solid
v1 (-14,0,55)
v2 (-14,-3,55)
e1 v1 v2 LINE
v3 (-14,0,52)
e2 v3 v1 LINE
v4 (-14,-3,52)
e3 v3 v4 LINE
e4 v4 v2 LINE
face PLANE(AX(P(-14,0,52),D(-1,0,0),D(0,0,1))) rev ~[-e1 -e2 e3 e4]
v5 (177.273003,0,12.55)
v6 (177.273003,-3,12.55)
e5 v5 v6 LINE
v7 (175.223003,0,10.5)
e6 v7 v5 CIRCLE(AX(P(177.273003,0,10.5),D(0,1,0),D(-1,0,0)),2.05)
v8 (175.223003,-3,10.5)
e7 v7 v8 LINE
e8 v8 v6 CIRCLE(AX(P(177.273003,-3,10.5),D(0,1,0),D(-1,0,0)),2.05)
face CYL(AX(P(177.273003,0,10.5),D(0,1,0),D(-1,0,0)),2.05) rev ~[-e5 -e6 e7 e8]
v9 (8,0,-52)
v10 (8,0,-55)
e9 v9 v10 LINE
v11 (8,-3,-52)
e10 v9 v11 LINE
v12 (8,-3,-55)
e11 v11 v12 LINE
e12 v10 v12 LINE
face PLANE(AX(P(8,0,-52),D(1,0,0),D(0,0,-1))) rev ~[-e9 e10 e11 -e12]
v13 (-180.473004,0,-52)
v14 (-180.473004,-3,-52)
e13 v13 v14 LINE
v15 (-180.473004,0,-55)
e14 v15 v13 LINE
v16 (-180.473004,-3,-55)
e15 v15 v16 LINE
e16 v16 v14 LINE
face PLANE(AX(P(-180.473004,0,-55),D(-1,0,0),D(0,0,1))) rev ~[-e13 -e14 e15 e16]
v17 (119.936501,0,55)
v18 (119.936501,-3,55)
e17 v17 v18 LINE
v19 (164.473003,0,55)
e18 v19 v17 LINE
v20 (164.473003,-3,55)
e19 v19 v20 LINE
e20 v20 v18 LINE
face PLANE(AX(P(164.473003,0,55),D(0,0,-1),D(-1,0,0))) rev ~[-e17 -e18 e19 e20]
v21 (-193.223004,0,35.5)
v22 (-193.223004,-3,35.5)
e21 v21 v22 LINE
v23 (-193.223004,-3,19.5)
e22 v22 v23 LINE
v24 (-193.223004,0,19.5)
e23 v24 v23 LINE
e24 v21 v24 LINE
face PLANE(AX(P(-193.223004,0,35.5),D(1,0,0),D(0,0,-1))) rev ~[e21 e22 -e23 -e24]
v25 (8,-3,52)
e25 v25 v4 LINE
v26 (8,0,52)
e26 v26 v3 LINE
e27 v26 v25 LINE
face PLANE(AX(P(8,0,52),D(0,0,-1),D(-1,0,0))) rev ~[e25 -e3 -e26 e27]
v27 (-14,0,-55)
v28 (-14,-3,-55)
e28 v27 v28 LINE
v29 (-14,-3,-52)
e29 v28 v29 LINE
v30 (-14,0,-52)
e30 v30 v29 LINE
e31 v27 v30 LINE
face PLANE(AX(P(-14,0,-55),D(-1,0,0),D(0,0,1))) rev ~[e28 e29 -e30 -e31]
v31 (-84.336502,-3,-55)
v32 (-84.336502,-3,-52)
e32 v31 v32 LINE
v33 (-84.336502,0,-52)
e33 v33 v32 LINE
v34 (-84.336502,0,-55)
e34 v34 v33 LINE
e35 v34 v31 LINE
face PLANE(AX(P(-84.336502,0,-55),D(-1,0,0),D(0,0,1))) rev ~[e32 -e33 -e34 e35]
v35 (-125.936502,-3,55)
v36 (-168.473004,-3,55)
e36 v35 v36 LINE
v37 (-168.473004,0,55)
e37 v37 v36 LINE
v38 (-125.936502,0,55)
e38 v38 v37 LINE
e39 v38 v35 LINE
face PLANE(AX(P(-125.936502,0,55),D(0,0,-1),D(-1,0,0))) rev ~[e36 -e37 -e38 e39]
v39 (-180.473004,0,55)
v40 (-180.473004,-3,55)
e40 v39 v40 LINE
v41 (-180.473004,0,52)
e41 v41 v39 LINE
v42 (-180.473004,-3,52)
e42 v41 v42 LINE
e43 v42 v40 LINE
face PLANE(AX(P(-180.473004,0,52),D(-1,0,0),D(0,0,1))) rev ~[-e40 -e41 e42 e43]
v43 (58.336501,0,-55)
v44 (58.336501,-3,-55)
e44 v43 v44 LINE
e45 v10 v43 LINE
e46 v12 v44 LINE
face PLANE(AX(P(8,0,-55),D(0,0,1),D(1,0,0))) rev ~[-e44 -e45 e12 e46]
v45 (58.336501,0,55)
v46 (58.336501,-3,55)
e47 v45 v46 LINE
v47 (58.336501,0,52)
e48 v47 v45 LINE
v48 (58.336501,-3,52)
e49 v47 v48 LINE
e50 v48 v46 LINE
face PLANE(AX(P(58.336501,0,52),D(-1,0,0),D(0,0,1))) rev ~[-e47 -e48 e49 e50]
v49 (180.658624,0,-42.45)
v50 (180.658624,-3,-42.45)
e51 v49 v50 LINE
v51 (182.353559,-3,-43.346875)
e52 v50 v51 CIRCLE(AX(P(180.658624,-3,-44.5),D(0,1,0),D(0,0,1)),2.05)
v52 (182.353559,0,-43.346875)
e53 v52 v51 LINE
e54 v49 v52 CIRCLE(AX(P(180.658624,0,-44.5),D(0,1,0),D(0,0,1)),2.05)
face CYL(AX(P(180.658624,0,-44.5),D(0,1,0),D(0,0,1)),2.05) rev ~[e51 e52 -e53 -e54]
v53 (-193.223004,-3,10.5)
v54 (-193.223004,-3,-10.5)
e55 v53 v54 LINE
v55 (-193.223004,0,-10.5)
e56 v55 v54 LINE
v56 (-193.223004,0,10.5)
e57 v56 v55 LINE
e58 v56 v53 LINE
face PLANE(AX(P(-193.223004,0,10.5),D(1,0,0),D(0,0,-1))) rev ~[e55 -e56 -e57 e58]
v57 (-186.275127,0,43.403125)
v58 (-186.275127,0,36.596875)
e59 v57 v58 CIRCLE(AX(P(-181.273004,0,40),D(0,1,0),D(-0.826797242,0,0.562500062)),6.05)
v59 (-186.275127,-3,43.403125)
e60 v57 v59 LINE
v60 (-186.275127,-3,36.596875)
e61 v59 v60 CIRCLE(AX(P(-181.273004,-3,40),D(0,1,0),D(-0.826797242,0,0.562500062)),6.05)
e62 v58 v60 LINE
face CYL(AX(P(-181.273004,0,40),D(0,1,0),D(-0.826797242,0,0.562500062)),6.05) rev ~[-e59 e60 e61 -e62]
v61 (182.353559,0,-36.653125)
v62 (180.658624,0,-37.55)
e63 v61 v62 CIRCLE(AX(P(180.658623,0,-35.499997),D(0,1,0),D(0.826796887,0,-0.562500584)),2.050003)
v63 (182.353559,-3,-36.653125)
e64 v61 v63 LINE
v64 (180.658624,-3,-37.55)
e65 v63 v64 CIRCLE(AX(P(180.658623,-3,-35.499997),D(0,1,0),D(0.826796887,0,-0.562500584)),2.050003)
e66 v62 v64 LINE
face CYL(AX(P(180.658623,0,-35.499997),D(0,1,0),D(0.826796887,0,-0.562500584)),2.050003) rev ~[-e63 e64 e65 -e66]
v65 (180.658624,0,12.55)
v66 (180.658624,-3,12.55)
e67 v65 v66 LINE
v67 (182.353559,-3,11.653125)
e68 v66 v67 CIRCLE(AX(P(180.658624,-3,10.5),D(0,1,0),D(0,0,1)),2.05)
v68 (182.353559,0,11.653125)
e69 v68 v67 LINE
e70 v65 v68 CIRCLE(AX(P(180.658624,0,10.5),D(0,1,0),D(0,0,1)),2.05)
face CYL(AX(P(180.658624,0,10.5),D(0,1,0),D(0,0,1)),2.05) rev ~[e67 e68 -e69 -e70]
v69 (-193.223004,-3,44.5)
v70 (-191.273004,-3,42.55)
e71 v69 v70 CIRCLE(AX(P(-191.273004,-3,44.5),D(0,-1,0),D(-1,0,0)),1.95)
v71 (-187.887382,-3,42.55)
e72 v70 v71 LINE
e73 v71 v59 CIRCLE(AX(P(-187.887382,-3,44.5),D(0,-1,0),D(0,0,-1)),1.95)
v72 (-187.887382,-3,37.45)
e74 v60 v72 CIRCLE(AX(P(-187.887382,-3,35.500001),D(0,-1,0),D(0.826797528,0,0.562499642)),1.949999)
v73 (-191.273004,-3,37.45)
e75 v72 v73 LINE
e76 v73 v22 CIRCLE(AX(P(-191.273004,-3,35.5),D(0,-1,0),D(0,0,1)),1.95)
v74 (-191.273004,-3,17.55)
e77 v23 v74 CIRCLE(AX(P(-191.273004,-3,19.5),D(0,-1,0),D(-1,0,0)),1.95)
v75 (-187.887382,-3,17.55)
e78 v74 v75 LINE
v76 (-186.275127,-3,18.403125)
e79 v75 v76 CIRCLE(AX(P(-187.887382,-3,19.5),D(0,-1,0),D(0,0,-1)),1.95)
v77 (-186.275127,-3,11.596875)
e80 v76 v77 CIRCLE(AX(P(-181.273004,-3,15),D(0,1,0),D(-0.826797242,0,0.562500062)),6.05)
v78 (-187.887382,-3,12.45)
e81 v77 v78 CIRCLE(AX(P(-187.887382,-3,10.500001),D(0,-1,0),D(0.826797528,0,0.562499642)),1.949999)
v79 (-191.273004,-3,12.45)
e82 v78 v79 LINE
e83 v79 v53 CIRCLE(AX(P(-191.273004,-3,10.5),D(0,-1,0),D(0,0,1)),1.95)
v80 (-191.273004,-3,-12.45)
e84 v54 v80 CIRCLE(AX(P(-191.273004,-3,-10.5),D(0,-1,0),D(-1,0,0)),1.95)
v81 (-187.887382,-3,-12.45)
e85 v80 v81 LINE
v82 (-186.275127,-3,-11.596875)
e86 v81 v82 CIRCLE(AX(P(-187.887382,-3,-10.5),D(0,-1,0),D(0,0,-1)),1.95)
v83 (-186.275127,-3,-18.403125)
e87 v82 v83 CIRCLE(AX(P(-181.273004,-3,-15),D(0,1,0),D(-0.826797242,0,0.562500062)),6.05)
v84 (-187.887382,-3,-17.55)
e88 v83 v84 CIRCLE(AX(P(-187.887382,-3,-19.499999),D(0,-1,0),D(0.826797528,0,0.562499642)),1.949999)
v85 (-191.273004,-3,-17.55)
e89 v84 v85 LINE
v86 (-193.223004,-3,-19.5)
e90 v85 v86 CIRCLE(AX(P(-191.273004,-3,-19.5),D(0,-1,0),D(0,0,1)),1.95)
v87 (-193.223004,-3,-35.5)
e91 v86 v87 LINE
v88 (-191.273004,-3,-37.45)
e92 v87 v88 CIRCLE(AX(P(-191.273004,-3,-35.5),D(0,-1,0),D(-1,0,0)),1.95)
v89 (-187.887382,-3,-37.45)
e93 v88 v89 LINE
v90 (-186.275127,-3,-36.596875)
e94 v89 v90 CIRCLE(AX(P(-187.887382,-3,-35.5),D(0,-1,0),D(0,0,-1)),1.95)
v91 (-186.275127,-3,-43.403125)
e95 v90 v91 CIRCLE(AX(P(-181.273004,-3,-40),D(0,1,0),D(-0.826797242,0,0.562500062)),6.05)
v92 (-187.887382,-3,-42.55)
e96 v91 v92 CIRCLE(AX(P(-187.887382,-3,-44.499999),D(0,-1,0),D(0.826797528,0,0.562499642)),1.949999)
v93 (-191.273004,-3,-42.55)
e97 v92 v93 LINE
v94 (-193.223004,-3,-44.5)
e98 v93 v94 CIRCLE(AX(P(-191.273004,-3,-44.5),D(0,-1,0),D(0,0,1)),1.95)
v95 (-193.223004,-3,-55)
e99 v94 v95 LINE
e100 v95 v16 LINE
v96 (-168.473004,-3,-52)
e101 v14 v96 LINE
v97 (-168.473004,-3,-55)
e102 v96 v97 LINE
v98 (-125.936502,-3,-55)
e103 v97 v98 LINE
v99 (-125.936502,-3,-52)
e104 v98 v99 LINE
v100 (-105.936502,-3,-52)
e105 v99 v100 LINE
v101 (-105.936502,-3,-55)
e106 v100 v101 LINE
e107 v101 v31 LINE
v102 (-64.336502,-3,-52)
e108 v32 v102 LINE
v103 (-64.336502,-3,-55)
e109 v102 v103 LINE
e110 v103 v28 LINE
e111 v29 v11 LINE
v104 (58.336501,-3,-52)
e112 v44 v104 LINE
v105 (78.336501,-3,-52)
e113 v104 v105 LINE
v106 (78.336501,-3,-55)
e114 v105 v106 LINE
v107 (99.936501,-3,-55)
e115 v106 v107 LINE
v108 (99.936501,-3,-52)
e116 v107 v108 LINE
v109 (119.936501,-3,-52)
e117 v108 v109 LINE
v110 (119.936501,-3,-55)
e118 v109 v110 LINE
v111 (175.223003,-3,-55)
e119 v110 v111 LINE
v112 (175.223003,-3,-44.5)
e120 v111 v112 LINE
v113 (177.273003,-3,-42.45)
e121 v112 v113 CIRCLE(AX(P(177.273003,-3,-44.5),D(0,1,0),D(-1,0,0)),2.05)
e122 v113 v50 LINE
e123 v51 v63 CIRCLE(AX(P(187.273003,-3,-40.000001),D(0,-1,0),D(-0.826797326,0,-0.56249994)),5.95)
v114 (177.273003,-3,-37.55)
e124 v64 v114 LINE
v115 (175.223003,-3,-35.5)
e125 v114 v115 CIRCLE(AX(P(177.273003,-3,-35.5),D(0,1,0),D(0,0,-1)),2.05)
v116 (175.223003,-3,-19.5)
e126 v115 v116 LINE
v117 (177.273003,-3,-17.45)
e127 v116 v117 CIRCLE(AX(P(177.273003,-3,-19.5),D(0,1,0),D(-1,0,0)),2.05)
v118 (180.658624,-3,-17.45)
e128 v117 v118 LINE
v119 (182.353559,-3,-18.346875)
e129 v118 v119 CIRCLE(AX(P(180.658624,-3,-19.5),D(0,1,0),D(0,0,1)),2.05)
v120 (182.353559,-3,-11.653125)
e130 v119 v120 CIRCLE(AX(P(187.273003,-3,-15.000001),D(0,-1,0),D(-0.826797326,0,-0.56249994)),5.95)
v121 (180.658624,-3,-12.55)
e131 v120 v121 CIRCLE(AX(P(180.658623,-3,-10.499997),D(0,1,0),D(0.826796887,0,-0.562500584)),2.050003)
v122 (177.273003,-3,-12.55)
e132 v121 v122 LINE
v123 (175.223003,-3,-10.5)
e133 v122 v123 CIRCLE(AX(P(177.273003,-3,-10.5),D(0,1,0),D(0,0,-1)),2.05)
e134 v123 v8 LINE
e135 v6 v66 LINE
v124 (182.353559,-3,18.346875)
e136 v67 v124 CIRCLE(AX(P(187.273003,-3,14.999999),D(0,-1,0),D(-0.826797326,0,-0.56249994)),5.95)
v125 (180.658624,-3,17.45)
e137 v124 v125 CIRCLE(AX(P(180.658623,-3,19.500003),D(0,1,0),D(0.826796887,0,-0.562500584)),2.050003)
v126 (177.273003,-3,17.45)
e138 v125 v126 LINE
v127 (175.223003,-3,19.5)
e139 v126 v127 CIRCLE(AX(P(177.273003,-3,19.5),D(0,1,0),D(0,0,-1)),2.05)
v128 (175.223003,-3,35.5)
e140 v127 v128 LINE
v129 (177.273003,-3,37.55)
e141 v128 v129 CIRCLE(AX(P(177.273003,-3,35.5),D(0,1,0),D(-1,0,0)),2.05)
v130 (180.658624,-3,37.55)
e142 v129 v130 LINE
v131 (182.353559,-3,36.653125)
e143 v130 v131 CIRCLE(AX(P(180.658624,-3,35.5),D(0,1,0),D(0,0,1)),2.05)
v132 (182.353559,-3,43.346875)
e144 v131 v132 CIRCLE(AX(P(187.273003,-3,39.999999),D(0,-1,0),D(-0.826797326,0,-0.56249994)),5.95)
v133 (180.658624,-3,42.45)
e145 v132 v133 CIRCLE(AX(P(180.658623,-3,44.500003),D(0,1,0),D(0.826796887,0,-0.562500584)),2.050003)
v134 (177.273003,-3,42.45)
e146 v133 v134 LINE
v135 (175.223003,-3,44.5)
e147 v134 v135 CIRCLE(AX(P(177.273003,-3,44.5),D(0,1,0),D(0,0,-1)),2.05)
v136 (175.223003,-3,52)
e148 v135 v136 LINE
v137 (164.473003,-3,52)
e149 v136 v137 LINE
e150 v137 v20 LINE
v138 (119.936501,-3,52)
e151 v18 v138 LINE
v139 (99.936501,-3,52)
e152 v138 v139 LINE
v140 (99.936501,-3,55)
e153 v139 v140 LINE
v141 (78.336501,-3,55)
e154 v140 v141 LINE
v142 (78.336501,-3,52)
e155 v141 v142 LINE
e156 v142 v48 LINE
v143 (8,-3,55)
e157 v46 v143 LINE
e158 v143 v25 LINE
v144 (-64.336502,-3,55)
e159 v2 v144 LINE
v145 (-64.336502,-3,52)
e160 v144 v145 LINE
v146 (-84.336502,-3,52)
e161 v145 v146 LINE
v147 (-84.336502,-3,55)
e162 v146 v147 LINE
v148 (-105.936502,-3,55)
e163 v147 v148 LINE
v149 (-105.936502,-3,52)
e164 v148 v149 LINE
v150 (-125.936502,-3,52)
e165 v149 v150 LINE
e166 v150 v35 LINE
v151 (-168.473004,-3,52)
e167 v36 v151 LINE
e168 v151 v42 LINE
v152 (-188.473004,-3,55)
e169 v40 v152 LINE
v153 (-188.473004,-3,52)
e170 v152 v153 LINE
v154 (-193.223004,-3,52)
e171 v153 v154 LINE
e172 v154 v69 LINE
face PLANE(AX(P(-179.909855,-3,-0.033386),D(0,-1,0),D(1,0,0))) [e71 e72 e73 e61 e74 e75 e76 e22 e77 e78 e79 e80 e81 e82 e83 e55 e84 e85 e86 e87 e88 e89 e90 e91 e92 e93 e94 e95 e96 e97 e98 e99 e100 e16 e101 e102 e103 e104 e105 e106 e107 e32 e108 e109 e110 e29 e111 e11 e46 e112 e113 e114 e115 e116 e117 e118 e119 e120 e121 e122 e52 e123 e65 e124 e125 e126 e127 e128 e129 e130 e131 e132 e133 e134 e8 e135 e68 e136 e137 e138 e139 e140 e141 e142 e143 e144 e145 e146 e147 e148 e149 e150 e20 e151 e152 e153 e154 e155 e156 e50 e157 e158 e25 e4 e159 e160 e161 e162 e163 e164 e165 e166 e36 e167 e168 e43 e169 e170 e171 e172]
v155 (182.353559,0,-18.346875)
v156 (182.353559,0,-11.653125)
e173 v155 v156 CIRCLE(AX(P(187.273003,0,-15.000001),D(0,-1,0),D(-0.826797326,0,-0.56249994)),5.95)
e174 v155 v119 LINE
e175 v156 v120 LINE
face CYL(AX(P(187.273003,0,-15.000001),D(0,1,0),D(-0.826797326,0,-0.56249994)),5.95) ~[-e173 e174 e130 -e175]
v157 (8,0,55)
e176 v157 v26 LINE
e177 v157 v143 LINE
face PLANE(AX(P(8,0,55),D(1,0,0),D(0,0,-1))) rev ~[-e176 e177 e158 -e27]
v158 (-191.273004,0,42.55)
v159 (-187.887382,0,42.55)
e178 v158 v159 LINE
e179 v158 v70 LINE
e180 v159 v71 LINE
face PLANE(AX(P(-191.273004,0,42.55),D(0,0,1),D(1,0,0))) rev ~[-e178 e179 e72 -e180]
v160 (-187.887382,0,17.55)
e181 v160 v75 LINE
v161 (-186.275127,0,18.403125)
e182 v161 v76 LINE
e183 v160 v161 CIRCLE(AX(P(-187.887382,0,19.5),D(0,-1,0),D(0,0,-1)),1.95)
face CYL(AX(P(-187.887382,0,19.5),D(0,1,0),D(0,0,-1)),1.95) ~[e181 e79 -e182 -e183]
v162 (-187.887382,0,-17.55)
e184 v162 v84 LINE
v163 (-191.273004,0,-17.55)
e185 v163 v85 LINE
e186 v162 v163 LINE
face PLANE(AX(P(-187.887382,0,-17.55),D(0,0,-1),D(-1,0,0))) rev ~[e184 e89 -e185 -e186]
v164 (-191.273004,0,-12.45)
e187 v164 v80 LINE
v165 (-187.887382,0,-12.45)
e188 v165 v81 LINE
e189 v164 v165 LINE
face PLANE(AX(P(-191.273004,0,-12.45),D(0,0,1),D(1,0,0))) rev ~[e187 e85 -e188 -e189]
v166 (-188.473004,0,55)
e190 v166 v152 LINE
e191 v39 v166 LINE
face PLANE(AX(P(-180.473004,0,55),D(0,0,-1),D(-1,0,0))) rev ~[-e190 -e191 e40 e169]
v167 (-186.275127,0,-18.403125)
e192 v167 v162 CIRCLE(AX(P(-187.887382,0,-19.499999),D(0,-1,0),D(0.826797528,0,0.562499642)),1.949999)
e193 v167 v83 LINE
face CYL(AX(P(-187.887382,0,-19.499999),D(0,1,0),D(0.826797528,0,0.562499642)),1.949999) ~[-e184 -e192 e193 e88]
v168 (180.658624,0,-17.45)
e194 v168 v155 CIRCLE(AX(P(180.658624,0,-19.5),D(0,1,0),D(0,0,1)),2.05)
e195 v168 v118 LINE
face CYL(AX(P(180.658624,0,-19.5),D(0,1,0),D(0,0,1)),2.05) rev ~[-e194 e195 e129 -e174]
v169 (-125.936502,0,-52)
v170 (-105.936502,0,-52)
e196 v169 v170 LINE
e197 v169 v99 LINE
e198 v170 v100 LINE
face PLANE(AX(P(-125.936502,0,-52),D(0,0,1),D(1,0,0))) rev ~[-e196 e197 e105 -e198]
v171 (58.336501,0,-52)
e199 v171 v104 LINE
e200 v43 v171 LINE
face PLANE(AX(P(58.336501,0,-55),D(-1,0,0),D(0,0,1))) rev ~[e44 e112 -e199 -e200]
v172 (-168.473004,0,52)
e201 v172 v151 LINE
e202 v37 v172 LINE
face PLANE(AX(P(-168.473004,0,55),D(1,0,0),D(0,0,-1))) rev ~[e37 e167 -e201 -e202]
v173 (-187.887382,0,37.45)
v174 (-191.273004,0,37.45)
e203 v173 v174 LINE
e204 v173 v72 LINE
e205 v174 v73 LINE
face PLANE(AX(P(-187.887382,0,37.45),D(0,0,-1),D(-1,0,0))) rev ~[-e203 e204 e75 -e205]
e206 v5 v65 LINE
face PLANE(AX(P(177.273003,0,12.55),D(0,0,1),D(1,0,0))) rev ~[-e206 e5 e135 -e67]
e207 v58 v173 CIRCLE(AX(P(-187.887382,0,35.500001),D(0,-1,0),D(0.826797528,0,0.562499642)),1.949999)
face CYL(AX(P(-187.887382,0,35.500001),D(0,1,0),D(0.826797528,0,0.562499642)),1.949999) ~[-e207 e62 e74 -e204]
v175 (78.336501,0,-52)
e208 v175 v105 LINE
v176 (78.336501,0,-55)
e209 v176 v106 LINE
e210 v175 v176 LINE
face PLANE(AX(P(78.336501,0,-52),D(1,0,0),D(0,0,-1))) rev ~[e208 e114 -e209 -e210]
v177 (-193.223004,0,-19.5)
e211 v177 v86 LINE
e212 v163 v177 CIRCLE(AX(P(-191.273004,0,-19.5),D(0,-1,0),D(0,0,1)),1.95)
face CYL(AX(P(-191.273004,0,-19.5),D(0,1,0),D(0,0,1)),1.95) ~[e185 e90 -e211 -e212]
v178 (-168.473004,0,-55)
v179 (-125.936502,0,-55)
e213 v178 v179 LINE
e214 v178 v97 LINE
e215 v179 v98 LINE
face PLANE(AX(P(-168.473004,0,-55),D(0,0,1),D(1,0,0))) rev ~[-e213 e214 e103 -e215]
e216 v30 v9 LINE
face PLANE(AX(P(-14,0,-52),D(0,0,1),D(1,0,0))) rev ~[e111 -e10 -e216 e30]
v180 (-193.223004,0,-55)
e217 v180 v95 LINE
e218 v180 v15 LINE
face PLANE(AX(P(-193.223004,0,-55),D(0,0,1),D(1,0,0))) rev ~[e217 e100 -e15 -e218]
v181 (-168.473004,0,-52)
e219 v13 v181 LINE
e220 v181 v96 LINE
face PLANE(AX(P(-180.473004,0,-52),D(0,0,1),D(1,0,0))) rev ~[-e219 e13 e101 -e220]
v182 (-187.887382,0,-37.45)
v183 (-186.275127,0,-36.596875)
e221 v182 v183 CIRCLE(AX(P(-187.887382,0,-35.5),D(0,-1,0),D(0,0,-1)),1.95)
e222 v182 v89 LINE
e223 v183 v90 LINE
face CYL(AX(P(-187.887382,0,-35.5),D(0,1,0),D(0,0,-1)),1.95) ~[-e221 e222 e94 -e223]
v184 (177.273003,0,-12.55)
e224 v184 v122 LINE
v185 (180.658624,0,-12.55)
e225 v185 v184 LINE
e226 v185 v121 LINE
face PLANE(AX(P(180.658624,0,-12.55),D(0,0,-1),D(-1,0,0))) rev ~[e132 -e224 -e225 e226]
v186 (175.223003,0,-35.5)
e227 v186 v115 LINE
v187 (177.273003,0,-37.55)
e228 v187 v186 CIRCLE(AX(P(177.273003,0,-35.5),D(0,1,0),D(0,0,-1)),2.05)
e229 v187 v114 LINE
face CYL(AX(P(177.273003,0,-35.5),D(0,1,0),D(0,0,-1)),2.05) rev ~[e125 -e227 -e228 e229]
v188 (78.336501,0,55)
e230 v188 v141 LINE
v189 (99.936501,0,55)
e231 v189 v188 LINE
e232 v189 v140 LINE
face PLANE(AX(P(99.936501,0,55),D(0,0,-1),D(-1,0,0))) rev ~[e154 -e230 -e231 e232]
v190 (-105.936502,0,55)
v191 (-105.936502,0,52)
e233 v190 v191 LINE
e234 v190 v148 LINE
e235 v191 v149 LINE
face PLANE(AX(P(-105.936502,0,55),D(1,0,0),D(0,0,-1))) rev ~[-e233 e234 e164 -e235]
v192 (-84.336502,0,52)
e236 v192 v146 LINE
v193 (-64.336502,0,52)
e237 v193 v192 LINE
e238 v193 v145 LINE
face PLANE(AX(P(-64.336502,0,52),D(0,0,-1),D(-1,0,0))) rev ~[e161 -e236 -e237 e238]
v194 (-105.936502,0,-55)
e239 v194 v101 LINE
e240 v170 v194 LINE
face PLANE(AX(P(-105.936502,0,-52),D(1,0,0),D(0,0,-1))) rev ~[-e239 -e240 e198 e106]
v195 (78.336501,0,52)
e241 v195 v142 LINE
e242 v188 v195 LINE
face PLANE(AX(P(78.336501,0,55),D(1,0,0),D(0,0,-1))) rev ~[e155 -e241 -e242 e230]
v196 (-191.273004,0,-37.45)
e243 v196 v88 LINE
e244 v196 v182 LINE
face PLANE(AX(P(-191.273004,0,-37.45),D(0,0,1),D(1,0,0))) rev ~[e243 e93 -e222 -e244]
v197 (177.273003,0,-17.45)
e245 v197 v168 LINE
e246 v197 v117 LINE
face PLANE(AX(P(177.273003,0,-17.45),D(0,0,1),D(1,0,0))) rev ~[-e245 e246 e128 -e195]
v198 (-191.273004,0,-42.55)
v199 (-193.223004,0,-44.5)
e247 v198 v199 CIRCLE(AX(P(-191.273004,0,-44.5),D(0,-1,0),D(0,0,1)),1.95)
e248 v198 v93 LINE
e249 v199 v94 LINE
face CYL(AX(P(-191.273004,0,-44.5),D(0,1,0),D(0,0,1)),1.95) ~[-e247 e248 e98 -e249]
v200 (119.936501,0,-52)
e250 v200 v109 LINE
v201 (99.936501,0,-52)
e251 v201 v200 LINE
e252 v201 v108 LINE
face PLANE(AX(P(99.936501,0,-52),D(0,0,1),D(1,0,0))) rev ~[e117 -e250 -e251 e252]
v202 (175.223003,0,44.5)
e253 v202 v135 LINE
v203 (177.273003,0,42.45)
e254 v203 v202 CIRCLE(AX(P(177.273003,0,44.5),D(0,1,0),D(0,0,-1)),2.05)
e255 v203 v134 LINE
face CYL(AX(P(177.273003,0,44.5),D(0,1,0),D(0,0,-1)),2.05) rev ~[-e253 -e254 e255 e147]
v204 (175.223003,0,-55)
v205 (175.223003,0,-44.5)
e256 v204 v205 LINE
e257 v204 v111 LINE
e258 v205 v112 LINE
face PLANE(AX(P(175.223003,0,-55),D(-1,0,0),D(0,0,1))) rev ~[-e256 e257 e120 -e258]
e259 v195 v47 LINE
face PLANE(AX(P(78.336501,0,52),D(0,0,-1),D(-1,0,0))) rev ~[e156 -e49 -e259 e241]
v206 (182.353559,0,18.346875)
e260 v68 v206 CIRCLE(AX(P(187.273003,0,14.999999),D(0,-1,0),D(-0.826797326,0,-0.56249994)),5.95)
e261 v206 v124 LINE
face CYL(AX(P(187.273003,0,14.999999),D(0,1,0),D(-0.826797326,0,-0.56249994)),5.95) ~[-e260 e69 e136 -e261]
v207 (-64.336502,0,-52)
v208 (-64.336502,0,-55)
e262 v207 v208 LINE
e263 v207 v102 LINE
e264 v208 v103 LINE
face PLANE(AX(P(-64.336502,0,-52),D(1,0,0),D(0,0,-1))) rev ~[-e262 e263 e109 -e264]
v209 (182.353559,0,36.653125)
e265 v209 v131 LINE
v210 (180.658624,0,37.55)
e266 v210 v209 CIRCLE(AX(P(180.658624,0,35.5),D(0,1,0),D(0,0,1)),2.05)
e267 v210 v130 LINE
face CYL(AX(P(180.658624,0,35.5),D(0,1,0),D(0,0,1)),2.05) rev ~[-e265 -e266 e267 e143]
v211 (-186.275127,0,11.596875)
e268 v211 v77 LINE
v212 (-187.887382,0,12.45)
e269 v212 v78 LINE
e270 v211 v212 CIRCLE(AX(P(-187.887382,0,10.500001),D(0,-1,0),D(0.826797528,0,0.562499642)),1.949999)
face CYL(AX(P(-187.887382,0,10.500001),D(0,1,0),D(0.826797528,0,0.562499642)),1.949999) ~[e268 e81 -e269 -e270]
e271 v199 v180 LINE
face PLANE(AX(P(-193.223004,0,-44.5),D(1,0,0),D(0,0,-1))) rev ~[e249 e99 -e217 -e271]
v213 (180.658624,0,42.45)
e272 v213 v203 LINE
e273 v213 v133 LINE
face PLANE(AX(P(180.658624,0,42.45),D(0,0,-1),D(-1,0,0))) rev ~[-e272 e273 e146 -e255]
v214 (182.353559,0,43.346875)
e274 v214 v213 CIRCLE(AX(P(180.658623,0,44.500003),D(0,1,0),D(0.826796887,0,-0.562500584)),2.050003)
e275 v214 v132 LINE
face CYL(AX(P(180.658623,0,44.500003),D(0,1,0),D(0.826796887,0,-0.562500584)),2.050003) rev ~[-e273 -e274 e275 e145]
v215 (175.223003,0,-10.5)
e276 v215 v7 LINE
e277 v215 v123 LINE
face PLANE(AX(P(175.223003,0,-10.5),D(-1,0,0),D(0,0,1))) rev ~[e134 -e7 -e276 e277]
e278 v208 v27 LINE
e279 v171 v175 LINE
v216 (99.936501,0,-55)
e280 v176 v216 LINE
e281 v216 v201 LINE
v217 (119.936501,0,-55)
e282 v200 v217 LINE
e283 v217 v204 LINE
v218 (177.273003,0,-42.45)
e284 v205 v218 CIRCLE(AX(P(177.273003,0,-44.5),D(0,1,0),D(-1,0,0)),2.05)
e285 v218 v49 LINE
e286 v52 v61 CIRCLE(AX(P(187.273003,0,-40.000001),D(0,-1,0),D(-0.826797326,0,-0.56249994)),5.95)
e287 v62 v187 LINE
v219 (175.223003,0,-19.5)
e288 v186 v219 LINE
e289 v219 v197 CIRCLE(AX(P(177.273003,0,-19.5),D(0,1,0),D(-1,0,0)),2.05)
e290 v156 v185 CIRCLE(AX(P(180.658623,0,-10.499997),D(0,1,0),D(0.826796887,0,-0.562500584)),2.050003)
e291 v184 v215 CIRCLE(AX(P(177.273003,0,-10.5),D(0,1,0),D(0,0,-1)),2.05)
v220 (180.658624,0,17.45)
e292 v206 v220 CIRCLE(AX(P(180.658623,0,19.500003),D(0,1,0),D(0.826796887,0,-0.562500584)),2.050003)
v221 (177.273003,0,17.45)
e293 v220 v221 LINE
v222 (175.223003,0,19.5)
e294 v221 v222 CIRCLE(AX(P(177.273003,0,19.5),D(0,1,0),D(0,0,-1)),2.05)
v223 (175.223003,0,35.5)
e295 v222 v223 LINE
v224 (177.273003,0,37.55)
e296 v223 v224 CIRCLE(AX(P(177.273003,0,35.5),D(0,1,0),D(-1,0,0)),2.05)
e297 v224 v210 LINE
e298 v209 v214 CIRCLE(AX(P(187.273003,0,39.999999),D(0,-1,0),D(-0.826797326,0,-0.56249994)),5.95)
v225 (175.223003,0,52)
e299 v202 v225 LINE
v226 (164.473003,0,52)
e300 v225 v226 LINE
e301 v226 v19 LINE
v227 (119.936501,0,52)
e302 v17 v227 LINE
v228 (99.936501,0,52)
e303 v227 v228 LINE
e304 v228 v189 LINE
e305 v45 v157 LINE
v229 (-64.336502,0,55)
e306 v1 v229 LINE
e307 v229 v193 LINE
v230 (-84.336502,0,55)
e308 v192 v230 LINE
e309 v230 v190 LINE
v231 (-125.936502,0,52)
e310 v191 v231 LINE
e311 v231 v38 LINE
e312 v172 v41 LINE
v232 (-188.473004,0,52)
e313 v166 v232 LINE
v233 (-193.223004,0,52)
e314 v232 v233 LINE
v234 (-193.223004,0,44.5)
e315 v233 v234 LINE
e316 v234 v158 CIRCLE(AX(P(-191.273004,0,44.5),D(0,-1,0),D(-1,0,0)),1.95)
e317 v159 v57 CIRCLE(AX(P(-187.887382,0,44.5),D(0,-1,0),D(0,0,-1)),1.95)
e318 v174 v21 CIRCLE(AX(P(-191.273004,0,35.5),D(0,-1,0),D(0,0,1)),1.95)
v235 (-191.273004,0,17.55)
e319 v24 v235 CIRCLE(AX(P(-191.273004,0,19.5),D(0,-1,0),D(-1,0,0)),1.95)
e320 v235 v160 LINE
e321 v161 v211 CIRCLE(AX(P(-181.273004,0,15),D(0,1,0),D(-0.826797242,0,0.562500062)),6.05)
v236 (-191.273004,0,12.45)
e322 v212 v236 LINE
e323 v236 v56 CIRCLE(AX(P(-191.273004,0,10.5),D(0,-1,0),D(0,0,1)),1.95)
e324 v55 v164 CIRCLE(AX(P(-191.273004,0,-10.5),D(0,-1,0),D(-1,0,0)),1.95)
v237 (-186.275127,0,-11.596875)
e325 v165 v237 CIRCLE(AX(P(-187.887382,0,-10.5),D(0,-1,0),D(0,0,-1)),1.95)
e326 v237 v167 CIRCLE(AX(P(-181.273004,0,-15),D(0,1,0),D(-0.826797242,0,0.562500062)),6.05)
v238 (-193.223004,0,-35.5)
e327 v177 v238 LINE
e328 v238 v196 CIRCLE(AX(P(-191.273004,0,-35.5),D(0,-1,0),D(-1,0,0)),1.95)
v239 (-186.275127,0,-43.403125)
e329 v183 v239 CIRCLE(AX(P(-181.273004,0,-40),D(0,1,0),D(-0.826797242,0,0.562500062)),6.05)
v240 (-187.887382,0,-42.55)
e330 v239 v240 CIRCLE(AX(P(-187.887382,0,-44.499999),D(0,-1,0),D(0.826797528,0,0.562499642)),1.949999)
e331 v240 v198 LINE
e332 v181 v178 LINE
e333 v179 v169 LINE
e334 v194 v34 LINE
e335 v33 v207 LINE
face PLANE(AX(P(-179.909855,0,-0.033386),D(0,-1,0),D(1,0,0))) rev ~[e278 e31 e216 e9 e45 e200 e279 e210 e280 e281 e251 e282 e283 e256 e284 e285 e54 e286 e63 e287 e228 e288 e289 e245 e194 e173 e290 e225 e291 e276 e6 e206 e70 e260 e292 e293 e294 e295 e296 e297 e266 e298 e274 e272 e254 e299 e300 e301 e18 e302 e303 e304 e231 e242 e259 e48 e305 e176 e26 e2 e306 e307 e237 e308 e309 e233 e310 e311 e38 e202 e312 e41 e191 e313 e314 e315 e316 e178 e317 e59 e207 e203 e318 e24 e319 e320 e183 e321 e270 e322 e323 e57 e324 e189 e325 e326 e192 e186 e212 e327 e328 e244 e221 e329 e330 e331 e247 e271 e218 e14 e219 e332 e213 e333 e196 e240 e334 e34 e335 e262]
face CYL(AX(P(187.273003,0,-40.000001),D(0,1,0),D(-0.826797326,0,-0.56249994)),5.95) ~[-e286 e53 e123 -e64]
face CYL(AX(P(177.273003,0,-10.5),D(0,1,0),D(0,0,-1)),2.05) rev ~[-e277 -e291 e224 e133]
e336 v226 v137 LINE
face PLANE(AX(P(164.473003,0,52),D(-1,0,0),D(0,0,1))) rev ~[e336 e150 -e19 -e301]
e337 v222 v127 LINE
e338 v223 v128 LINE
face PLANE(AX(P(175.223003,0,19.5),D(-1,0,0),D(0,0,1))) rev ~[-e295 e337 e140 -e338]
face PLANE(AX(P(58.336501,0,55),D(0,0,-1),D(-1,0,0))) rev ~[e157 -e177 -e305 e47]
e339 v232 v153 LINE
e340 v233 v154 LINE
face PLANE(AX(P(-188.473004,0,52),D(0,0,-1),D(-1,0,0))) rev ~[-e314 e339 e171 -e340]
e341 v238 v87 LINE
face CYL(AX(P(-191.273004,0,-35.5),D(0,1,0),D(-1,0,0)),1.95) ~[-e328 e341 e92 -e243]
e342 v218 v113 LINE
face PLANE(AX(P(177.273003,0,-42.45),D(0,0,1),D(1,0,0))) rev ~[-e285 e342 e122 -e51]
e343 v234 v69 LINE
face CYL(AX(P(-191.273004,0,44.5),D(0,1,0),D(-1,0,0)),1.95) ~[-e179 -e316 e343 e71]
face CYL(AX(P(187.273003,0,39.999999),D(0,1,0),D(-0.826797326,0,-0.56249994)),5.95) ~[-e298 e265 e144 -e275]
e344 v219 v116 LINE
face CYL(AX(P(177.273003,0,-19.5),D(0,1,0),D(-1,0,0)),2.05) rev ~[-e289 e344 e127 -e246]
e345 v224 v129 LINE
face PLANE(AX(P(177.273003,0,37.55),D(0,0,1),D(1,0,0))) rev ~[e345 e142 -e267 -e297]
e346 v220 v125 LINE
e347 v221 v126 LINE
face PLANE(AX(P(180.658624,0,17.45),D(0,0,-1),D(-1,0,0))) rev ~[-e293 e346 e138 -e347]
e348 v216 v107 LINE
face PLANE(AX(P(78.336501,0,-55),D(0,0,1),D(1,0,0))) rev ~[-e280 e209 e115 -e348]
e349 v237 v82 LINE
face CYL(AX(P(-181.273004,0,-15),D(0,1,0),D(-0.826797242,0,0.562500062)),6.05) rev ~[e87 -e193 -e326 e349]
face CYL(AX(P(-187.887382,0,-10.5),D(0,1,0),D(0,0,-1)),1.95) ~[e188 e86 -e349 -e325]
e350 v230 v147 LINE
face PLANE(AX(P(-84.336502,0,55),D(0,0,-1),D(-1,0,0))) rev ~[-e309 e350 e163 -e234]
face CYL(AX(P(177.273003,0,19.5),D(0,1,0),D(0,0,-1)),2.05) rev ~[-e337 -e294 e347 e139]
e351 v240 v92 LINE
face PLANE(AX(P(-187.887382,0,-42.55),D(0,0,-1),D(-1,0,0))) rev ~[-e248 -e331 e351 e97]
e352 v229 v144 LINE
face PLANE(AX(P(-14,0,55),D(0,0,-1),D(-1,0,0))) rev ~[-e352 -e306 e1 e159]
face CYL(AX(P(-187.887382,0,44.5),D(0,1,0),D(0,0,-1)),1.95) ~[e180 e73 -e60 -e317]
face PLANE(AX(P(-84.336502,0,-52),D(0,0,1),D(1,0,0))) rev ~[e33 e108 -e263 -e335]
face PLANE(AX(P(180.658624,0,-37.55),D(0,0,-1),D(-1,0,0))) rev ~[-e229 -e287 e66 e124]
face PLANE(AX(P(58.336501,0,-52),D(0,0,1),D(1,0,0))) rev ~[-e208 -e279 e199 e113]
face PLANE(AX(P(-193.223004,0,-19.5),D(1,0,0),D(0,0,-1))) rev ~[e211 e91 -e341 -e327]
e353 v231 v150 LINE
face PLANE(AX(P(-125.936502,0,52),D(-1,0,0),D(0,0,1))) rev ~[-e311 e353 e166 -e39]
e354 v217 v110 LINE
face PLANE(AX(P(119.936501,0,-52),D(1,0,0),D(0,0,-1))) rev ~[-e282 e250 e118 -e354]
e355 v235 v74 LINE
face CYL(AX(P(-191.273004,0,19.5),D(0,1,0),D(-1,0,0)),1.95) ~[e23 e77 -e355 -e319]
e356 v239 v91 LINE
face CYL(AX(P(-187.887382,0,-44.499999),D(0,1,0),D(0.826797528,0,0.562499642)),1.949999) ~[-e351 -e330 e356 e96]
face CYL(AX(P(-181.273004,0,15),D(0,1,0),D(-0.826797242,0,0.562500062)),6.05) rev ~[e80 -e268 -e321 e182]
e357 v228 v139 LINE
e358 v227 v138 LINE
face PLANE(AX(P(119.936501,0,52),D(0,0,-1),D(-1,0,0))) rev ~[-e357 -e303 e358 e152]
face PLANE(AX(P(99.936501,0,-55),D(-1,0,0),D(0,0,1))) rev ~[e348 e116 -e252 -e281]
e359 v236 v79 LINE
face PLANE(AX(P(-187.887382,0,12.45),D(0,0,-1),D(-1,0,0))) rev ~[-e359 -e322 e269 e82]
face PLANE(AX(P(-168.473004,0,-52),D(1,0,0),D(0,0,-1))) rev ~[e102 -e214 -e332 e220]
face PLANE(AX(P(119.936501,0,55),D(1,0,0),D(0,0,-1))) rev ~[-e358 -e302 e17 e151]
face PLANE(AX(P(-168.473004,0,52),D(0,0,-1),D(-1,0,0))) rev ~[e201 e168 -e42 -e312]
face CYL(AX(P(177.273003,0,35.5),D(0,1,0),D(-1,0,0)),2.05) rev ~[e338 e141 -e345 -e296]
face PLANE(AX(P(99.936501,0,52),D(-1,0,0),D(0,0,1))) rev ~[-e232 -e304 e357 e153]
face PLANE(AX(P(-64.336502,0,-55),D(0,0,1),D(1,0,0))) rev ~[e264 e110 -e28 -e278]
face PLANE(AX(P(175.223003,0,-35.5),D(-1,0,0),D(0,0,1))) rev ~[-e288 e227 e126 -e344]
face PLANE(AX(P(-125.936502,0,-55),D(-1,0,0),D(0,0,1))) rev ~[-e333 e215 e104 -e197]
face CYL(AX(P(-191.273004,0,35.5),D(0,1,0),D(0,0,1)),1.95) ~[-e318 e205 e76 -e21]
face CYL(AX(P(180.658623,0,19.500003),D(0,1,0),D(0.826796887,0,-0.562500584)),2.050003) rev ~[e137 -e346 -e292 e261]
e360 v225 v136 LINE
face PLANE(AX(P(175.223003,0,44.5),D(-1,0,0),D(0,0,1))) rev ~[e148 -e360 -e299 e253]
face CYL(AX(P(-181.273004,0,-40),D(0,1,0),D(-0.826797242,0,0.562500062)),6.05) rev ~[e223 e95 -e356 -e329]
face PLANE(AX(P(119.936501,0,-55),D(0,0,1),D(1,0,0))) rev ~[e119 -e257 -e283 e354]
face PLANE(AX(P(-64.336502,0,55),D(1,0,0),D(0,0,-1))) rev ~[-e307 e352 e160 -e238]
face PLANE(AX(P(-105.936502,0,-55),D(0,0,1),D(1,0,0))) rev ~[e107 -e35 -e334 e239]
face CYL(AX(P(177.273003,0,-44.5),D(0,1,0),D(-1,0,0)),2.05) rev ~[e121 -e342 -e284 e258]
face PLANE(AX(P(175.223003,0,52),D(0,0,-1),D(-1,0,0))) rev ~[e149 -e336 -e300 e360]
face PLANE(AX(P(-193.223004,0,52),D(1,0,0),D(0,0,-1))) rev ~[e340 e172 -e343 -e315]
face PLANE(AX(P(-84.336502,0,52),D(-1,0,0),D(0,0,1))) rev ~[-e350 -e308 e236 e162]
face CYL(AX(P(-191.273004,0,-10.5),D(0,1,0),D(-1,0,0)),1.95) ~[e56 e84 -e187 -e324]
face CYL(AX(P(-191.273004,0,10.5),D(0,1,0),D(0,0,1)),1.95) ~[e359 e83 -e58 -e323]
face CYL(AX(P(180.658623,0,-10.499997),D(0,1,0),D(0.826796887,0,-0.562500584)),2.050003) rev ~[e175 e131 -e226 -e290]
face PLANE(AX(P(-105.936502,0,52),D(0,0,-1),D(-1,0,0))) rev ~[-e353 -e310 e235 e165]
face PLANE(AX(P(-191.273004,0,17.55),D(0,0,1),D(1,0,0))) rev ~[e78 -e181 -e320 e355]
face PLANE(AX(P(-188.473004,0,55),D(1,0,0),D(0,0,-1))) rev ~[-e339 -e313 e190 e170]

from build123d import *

# Parameters (mm, degrees)
F0_W     = 16.768251
F0_H     = 110
F0_W_2   = 16.76825
F1_DEPTH = 3


# Not quite as in the source:
# - ends of sketch curves that miss each other by under 0.0002 mm in the source are joined


with BuildPart() as f1:
    # F0 (on Front) → F1 (new body)
    with BuildSketch(Plane.XZ):
        with BuildLine():
            Line((-165.473004, -55), (-165.473004, 55))
            Line((-165.473004, 55), (-168.473004, 55))
            Line((-168.473004, 55), (-168.473004, 52))
            Line((-168.473004, 52), (-180.473004, 52))
            Line((-180.473004, 52), (-180.473004, 55))
            Line((-180.473004, 55), (-188.473004, 55))
            Line((-188.473004, 55), (-188.473004, 52))
            Line((-188.473004, 52), (-193.223004, 52))
            Line((-193.223004, 52), (-193.223004, 44.5))
            ThreePointArc((-193.223004, 44.5), (-192.6518622233, 43.1211417767), (-191.273004, 42.55))
            Line((-191.273004, 42.55), (-187.887382, 42.55))
            ThreePointArc((-187.887382, 42.55), (-186.9753529387, 42.7764272596), (-186.2751272015, 43.4031251371))
            ThreePointArc((-186.2751272015, 43.4031251371), (-175.223004, 40), (-186.2751273913, 36.5968747338))
            ThreePointArc((-186.2751273913, 36.5968747338), (-186.9753529387, 37.2235727404), (-187.887382, 37.45))
            Line((-187.887382, 37.45), (-191.273004, 37.45))
            ThreePointArc((-191.273004, 37.45), (-192.6518622233, 36.8788582233), (-193.223004, 35.5))
            Line((-193.223004, 35.5), (-193.223004, 19.5))
            ThreePointArc((-193.223004, 19.5), (-192.6518622233, 18.1211417767), (-191.273004, 17.55))
            Line((-191.273004, 17.55), (-187.887382, 17.55))
            ThreePointArc((-187.887382, 17.55), (-186.9753529387, 17.7764272596), (-186.2751272015, 18.4031251371))
            ThreePointArc((-186.2751272015, 18.4031251371), (-175.223004, 15), (-186.2751273913, 11.5968747338))
            ThreePointArc((-186.2751273913, 11.5968747338), (-186.9753529387, 12.2235727404), (-187.887382, 12.45))
            Line((-187.887382, 12.45), (-191.273004, 12.45))
            ThreePointArc((-191.273004, 12.45), (-192.6518622233, 11.8788582233), (-193.223004, 10.5))
            Line((-193.223004, 10.5), (-193.223004, -10.5))
            ThreePointArc((-193.223004, -10.5), (-192.6518622233, -11.8788582233), (-191.273004, -12.45))
            Line((-191.273004, -12.45), (-187.887382, -12.45))
            ThreePointArc((-187.887382, -12.45), (-186.9753529387, -12.2235727404), (-186.2751272015, -11.5968748629))
            ThreePointArc((-186.2751272015, -11.5968748629), (-175.223004, -15), (-186.2751273913, -18.4031252662))
            ThreePointArc((-186.2751273913, -18.4031252662), (-186.9753529387, -17.7764272596), (-187.887382, -17.55))
            Line((-187.887382, -17.55), (-191.273004, -17.55))
            ThreePointArc((-191.273004, -17.55), (-192.6518622233, -18.1211417767), (-193.223004, -19.5))
            Line((-193.223004, -19.5), (-193.223004, -35.5))
            ThreePointArc((-193.223004, -35.5), (-192.6518622233, -36.8788582233), (-191.273004, -37.45))
            Line((-191.273004, -37.45), (-187.887382, -37.45))
            ThreePointArc((-187.887382, -37.45), (-186.9753529387, -37.2235727404), (-186.2751272015, -36.5968748629))
            ThreePointArc((-186.2751272015, -36.5968748629), (-175.223004, -40), (-186.2751273913, -43.4031252662))
            ThreePointArc((-186.2751273913, -43.4031252662), (-186.9753529387, -42.7764272596), (-187.887382, -42.55))
            Line((-187.887382, -42.55), (-191.273004, -42.55))
            ThreePointArc((-191.273004, -42.55), (-192.6518622233, -43.1211417767), (-193.223004, -44.5))
            Line((-193.223004, -44.5), (-193.223004, -55))
            Line((-193.223004, -55), (-180.473004, -55))
            Line((-180.473004, -55), (-180.473004, -52))
            Line((-180.473004, -52), (-168.473004, -52))
            Line((-168.473004, -52), (-168.473004, -55))
            Line((-168.473004, -55), (-165.473004, -55))
        make_face()
        with Locations((-157.0888785, 0)):
            Rectangle(F0_W, F0_H)
        with Locations((-140.3206275, 0)):
            Rectangle(F0_W, F0_H)
        Polygon((-58.336502, -55), (-58.336502, 55), (-64.336502, 55), (-64.336502, 52), (-84.336502, 52), (-84.336502, 55), (-105.936502, 55), (-105.936502, 52), (-125.936502, 52), (-125.936502, 55), (-131.936502, 55), (-131.936502, -55), (-125.936502, -55), (-125.936502, -52), (-105.936502, -52), (-105.936502, -55), (-84.336502, -55), (-84.336502, -52), (-64.336502, -52), (-64.336502, -55), align=None)
        with Locations((-33.1841255, 0)):
            Rectangle(F0_W, F0_H)
        Polygon((18.8, -55), (18.8, 55), (8, 55), (8, 52), (-14, 52), (-14, 55), (-24.8, 55), (-24.8, -55), (-14, -55), (-14, -52), (8, -52), (8, -55), align=None)
        with Locations((27.184125, 0)):
            Rectangle(F0_W_2, F0_H)
        with Locations((43.9523755, 0)):
            Rectangle(F0_W, F0_H)
        Polygon((125.936501, -55), (125.936501, 55), (119.936501, 55), (119.936501, 52), (99.936501, 52), (99.936501, 55), (78.336501, 55), (78.336501, 52), (58.336501, 52), (58.336501, 55), (52.336501, 55), (52.336501, -55), (58.336501, -55), (58.336501, -52), (78.336501, -52), (78.336501, -55), (99.936501, -55), (99.936501, -52), (119.936501, -52), (119.936501, -55), align=None)
        with Locations((134.3206265, 0)):
            Rectangle(F0_W, F0_H)
        with Locations((151.0888775, 0)):
            Rectangle(F0_W, F0_H)
        with BuildLine():
            Line((164.473003, 55), (159.473003, 55))
            Line((159.473003, 55), (159.473003, -55))
            Line((159.473003, -55), (175.223003, -55))
            Line((175.223003, -55), (175.223003, -44.5))
            ThreePointArc((175.223003, -44.5), (175.8234340986, -43.0504310986), (177.273003, -42.45))
            Line((177.273003, -42.45), (180.658624, -42.45))
            ThreePointArc((180.658624, -42.45), (181.6174238462, -42.6880389477), (182.3535586128, -43.3468752634))
            ThreePointArc((182.3535586128, -43.3468752634), (193.223003, -40), (182.3535591066, -36.6531250725))
            ThreePointArc((182.3535591066, -36.6531250725), (181.6174238462, -37.3119610523), (180.658624, -37.55))
            Line((180.658624, -37.55), (177.273003, -37.55))
            ThreePointArc((177.273003, -37.55), (175.8234340986, -36.9495689014), (175.223003, -35.5))
            Line((175.223003, -35.5), (175.223003, -19.5))
            ThreePointArc((175.223003, -19.5), (175.8234340986, -18.0504310986), (177.273003, -17.45))
            Line((177.273003, -17.45), (180.658624, -17.45))
            ThreePointArc((180.658624, -17.45), (181.6174238462, -17.6880389477), (182.3535586128, -18.3468752634))
            ThreePointArc((182.3535586128, -18.3468752634), (193.223003, -15), (182.3535591066, -11.6531250725))
            ThreePointArc((182.3535591066, -11.6531250725), (181.6174238462, -12.3119610523), (180.658624, -12.55))
            Line((180.658624, -12.55), (177.273003, -12.55))
            ThreePointArc((177.273003, -12.55), (175.8234340986, -11.9495689014), (175.223003, -10.5))
            Line((175.223003, -10.5), (175.223003, 10.5))
            ThreePointArc((175.223003, 10.5), (175.8234340986, 11.9495689014), (177.273003, 12.55))
            Line((177.273003, 12.55), (180.658624, 12.55))
            ThreePointArc((180.658624, 12.55), (181.6174238462, 12.3119610523), (182.3535586128, 11.6531247366))
            ThreePointArc((182.3535586128, 11.6531247366), (193.223003, 15), (182.3535591066, 18.3468749275))
            ThreePointArc((182.3535591066, 18.3468749275), (181.6174238462, 17.6880389477), (180.658624, 17.45))
            Line((180.658624, 17.45), (177.273003, 17.45))
            ThreePointArc((177.273003, 17.45), (175.8234340986, 18.0504310986), (175.223003, 19.5))
            Line((175.223003, 19.5), (175.223003, 35.5))
            ThreePointArc((175.223003, 35.5), (175.8234340986, 36.9495689014), (177.273003, 37.55))
            Line((177.273003, 37.55), (180.658624, 37.55))
            ThreePointArc((180.658624, 37.55), (181.6174238462, 37.3119610523), (182.3535586128, 36.6531247366))
            ThreePointArc((182.3535586128, 36.6531247366), (193.223003, 40), (182.3535591066, 43.3468749275))
            ThreePointArc((182.3535591066, 43.3468749275), (181.6174238462, 42.6880389477), (180.658624, 42.45))
            Line((180.658624, 42.45), (177.273003, 42.45))
            ThreePointArc((177.273003, 42.45), (175.8234340986, 43.0504310986), (175.223003, 44.5))
            Line((175.223003, 44.5), (175.223003, 52))
            Line((175.223003, 52), (164.473003, 52))
            Line((164.473003, 52), (164.473003, 55))
        make_face()
        with Locations((-49.9523765, 0)):
            Rectangle(F0_W, F0_H)
    extrude(amount=F1_DEPTH)


solid = f1.part
